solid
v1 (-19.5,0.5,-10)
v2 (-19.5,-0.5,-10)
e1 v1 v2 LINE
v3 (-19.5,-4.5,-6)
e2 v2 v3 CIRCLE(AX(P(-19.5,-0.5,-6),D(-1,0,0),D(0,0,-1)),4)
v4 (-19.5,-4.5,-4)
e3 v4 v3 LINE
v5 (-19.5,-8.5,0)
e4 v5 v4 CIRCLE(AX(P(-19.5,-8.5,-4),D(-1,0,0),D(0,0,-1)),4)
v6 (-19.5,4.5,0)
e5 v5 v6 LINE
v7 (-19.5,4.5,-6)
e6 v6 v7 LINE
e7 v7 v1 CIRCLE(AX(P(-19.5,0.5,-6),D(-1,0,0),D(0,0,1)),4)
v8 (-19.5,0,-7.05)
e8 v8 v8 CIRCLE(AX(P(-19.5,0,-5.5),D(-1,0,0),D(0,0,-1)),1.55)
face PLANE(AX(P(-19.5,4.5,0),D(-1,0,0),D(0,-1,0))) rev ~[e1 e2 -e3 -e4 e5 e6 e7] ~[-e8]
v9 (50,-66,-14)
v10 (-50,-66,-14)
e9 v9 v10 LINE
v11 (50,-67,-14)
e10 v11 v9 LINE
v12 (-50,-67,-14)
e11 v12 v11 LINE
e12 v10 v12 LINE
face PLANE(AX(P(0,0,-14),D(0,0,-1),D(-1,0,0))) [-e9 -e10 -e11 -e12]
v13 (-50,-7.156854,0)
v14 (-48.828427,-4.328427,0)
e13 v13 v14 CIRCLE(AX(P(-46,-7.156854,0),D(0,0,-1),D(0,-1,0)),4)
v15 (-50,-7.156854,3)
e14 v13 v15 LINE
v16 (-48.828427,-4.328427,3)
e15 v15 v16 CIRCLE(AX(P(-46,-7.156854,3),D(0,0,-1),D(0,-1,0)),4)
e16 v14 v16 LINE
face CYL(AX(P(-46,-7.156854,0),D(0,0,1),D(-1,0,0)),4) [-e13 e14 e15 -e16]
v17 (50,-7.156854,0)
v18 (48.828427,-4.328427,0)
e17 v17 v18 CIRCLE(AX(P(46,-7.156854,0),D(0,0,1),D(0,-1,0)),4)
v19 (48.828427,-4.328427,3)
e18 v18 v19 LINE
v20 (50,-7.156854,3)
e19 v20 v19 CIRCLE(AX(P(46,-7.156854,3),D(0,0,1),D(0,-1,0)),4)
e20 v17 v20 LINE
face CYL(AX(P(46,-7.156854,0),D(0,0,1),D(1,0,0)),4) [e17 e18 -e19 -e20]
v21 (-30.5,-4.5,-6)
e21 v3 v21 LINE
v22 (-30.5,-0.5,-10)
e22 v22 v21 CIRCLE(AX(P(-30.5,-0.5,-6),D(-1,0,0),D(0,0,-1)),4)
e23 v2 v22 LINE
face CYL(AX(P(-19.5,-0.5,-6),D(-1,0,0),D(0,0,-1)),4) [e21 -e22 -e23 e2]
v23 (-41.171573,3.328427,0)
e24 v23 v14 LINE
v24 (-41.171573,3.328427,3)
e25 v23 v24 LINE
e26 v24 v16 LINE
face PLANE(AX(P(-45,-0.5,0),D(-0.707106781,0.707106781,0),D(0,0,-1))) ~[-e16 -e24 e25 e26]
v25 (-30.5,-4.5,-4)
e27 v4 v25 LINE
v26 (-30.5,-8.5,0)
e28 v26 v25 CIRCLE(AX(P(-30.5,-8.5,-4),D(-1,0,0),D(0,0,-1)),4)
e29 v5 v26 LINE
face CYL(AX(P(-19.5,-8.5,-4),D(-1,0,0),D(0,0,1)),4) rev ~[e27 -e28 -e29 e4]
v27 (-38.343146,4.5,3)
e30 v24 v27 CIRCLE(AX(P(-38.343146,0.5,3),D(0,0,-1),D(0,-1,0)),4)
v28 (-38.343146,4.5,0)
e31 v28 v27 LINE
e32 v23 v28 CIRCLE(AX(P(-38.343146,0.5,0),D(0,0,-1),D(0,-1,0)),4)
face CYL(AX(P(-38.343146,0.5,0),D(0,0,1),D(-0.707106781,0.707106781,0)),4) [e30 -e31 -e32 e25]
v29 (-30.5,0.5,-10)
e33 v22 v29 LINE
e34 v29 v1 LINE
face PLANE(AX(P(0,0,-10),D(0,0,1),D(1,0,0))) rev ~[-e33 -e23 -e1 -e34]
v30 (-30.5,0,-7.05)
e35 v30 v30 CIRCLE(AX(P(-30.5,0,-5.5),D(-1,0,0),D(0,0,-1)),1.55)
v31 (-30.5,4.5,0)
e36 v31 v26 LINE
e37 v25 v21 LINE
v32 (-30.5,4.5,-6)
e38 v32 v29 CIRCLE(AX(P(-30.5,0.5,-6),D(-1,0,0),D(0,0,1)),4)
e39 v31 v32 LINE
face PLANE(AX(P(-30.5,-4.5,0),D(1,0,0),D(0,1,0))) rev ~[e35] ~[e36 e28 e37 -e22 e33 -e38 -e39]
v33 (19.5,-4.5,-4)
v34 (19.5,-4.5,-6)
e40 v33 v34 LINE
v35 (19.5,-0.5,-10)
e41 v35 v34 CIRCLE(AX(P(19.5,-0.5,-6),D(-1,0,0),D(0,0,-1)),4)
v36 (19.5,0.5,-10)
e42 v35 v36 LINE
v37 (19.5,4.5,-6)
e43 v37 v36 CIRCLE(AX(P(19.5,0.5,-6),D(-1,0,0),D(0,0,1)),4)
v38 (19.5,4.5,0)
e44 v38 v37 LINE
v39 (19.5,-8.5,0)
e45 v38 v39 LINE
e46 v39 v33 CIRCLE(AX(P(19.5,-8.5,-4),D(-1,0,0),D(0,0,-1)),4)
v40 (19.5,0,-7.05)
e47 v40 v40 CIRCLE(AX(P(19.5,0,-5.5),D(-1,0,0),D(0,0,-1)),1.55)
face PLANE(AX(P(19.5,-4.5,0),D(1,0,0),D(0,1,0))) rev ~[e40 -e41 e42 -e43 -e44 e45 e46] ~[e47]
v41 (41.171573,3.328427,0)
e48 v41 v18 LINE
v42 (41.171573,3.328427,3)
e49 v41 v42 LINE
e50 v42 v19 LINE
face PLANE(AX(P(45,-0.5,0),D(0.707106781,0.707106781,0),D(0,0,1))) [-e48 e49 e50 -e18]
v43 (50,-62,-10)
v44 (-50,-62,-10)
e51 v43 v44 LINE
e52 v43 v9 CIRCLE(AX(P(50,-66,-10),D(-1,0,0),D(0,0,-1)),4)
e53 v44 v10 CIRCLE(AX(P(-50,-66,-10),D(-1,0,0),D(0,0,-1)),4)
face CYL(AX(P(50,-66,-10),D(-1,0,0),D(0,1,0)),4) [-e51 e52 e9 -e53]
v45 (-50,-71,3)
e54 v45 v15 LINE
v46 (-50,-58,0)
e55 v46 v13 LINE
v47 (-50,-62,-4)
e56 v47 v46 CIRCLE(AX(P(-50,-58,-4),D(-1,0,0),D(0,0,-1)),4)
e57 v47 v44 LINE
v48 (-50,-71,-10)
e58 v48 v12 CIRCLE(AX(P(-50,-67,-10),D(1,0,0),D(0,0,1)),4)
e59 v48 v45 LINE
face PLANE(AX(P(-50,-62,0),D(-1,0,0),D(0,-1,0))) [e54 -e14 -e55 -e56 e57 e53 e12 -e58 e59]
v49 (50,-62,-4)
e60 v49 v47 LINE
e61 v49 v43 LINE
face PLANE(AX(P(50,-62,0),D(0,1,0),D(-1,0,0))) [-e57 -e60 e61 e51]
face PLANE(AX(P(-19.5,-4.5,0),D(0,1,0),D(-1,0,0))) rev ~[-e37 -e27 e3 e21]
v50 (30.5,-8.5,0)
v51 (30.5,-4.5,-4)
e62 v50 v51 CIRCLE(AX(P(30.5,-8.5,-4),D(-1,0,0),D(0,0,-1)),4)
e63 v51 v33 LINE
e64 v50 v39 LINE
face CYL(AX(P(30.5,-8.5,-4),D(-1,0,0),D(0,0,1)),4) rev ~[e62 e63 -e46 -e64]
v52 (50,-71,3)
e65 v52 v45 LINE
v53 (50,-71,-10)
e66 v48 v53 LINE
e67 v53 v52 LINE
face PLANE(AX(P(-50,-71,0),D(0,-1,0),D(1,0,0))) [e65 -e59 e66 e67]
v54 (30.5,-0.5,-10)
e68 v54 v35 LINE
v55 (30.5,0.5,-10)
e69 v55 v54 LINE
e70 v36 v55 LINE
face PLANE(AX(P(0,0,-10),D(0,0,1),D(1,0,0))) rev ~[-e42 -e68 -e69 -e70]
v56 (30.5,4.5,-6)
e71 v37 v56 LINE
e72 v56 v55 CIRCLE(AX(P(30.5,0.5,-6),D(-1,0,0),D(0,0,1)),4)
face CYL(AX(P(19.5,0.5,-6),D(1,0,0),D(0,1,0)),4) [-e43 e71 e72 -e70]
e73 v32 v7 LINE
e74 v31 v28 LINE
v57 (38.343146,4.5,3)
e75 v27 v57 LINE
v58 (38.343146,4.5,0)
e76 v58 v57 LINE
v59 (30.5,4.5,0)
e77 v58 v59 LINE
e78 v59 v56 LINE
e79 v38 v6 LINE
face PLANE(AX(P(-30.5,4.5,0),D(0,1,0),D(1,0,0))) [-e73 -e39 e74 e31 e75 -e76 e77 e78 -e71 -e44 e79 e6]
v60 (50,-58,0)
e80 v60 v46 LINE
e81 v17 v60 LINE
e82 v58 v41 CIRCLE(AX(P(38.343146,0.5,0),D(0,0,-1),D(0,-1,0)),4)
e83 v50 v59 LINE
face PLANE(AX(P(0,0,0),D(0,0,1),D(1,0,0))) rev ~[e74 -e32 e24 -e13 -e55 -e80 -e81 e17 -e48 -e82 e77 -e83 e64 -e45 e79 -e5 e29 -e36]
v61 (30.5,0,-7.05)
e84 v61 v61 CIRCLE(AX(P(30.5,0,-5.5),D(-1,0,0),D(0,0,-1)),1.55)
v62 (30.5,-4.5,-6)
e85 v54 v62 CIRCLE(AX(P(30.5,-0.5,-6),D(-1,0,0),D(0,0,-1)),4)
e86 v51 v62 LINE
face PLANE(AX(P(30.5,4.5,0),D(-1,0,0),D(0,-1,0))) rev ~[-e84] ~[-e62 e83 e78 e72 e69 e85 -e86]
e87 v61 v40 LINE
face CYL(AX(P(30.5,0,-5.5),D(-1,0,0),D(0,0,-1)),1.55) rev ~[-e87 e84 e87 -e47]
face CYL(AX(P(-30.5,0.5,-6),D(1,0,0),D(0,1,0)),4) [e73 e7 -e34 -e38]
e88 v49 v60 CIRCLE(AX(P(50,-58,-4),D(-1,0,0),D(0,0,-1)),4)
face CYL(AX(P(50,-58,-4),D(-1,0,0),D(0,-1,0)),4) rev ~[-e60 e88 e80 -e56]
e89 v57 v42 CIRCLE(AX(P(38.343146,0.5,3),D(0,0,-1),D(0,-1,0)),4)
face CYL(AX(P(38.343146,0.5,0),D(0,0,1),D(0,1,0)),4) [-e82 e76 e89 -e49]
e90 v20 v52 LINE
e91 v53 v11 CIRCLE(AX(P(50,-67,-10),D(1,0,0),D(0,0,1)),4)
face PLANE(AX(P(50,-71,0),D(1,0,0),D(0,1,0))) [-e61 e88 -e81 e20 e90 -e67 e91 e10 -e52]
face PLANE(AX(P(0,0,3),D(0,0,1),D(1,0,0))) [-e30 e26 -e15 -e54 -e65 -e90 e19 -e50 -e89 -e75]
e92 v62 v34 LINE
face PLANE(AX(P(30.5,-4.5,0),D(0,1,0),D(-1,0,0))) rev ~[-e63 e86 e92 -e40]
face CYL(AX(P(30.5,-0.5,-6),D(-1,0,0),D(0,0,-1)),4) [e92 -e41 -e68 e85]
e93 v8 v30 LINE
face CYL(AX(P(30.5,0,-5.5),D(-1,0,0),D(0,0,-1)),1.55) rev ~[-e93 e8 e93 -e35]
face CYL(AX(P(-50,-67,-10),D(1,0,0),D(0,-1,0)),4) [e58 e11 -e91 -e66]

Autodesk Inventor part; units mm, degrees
ref_plane "YZ Plane" through (0, 0, 0) normal (1, 0, 0) x (0, 1, 0)
ref_plane "XZ Plane" through (0, 0, 0) normal (0, 1, 0) x (-1, 0, 0)
ref_plane "XY Plane" through (0, 0, 0) normal (0, 0, 1) x (1, 0, 0)
sketch "Sketch1" plane through (0, 0, 0) normal (0, 0, 1) x (1, 0, 0)
  line L0 (-30.5, 4.5) -> (-19.5, 4.5)
  line L1 (-19.5, 4.5) -> (-19.5, -4.5)
  line L2 (-19.5, -4.5) -> (-30.5, -4.5)
  line L3 (-30.5, -4.5) -> (-30.5, 4.5)
  line L4 (19.5, 4.5) -> (30.5, 4.5)
  line L5 (30.5, 4.5) -> (30.5, -4.5)
  line L6 (30.5, -4.5) -> (19.5, -4.5)
  line L7 (19.5, -4.5) -> (19.5, 4.5)
  line L8 (-50, 4.5) -> (50, 4.5)
  line L9 (50, 4.5) -> (50, -71)
  line L10 (50, -71) -> (-50, -71)
  line L11 (-50, -71) -> (-50, 4.5)
  point P0 (0, 0)
  dimension "d0" = 11
  dimension "d1" = 9
  dimension "d2" = 19.5
  dimension "d3" = 4.5
  dimension "d4" = 11
  dimension "d5" = 19.5
  dimension "d6" = 9
  dimension "d7" = 100
  dimension "d8" = 50
  dimension "d9" = 4.5
  dimension "d10" = 71
extrude "Extrusion1" add sketch "Sketch1" along normal blind 3
extrude "Extrusion2" add sketch "Sketch1" against normal blind 10 contours L0 L1 L2 L3 | L4 L5 L6 L7
sketch "Sketch2" plane through (30.5, -4.5, 0) normal (1, 0, 0) x (0, 0, -1)
  line L0 (0, 0) -> (0, 9) projected
  line L1 (0, 0) -> (10, 0) projected
  line L2 (10, 9) -> (10, 0) projected
  line L3 (0, 9) -> (10, 9) projected
  point P0 (0, 4.5)
  point P1 (5.5, 4.5)
  dimension "d15" = 4.5
  dimension "d16" = 4.5
hole "Hole1" at (30.5, 0, -5.5) direction (-1, 0, 0) diameter 3.1 end through all
fillet "Fillet1" radius 4 6 edges at (25, 4.5, -10) (25, -4.5, -10) (-25, -4.5, -10) (-25, 4.5, -10) (-25, -4.5, 0) (25, -4.5, 0)
chamfer "Chamfer1" distance 10 angle 45 2 edges at (50, 4.5, 1.5) (-50, 4.5, 1.5)
sketch "Sketch3" plane through (0, 0, 0) normal (0, 0, -1) x (-1, 0, 0)
  line L0 (40, 4.5) -> (50, -5.5) projected
  line L1 (30.5, 4.5) -> (40, 4.5) projected
  line L2 (30.5, 4.5) -> (30.5, -8.5) projected
  line L3 (19.5, -8.5) -> (30.5, -8.5) projected
  line L4 (19.5, -8.5) -> (19.5, 4.5) projected
  line L5 (-19.5, 4.5) -> (19.5, 4.5) projected
  line L6 (-19.5, 4.5) -> (-19.5, -8.5) projected
  line L7 (-30.5, -8.5) -> (-19.5, -8.5) projected
  line L8 (-30.5, -8.5) -> (-30.5, 4.5) projected
  line L9 (-40, 4.5) -> (-30.5, 4.5) projected
  line L10 (-50, -5.5) -> (-40, 4.5) projected
  line L11 (-50, -71) -> (-50, -5.5) projected
  line L12 (50, -71) -> (-50, -71) projected
  line L13 (50, -5.5) -> (50, -71) projected
  line L14 (-50, -62) -> (50, -62)
  point P0 (0, 0)
  dimension "d28" = 9
extrude "Extrusion3" add sketch "Sketch3" along normal blind 14 contours L13 L12 L11 L14
fillet "Fillet2" radius 4 3 edges at (0, -71, -14) (0, -62, -14) (0, -62, 0)
fillet "Fillet3" radius 4 4 edges at (-50, -5.5, 1.5) (-40, 4.5, 1.5) (40, 4.5, 1.5) (50, -5.5, 1.5)
equation "\"d3\" = 0.5 * d1"
equation "\"d4\" = d0"
equation "\"d5\" = d2"
equation "\"d8\" = 0.5 * d7"
equation "\"d16\" = d15"
properties part number "3DP_PLA_Stand_Leg"
